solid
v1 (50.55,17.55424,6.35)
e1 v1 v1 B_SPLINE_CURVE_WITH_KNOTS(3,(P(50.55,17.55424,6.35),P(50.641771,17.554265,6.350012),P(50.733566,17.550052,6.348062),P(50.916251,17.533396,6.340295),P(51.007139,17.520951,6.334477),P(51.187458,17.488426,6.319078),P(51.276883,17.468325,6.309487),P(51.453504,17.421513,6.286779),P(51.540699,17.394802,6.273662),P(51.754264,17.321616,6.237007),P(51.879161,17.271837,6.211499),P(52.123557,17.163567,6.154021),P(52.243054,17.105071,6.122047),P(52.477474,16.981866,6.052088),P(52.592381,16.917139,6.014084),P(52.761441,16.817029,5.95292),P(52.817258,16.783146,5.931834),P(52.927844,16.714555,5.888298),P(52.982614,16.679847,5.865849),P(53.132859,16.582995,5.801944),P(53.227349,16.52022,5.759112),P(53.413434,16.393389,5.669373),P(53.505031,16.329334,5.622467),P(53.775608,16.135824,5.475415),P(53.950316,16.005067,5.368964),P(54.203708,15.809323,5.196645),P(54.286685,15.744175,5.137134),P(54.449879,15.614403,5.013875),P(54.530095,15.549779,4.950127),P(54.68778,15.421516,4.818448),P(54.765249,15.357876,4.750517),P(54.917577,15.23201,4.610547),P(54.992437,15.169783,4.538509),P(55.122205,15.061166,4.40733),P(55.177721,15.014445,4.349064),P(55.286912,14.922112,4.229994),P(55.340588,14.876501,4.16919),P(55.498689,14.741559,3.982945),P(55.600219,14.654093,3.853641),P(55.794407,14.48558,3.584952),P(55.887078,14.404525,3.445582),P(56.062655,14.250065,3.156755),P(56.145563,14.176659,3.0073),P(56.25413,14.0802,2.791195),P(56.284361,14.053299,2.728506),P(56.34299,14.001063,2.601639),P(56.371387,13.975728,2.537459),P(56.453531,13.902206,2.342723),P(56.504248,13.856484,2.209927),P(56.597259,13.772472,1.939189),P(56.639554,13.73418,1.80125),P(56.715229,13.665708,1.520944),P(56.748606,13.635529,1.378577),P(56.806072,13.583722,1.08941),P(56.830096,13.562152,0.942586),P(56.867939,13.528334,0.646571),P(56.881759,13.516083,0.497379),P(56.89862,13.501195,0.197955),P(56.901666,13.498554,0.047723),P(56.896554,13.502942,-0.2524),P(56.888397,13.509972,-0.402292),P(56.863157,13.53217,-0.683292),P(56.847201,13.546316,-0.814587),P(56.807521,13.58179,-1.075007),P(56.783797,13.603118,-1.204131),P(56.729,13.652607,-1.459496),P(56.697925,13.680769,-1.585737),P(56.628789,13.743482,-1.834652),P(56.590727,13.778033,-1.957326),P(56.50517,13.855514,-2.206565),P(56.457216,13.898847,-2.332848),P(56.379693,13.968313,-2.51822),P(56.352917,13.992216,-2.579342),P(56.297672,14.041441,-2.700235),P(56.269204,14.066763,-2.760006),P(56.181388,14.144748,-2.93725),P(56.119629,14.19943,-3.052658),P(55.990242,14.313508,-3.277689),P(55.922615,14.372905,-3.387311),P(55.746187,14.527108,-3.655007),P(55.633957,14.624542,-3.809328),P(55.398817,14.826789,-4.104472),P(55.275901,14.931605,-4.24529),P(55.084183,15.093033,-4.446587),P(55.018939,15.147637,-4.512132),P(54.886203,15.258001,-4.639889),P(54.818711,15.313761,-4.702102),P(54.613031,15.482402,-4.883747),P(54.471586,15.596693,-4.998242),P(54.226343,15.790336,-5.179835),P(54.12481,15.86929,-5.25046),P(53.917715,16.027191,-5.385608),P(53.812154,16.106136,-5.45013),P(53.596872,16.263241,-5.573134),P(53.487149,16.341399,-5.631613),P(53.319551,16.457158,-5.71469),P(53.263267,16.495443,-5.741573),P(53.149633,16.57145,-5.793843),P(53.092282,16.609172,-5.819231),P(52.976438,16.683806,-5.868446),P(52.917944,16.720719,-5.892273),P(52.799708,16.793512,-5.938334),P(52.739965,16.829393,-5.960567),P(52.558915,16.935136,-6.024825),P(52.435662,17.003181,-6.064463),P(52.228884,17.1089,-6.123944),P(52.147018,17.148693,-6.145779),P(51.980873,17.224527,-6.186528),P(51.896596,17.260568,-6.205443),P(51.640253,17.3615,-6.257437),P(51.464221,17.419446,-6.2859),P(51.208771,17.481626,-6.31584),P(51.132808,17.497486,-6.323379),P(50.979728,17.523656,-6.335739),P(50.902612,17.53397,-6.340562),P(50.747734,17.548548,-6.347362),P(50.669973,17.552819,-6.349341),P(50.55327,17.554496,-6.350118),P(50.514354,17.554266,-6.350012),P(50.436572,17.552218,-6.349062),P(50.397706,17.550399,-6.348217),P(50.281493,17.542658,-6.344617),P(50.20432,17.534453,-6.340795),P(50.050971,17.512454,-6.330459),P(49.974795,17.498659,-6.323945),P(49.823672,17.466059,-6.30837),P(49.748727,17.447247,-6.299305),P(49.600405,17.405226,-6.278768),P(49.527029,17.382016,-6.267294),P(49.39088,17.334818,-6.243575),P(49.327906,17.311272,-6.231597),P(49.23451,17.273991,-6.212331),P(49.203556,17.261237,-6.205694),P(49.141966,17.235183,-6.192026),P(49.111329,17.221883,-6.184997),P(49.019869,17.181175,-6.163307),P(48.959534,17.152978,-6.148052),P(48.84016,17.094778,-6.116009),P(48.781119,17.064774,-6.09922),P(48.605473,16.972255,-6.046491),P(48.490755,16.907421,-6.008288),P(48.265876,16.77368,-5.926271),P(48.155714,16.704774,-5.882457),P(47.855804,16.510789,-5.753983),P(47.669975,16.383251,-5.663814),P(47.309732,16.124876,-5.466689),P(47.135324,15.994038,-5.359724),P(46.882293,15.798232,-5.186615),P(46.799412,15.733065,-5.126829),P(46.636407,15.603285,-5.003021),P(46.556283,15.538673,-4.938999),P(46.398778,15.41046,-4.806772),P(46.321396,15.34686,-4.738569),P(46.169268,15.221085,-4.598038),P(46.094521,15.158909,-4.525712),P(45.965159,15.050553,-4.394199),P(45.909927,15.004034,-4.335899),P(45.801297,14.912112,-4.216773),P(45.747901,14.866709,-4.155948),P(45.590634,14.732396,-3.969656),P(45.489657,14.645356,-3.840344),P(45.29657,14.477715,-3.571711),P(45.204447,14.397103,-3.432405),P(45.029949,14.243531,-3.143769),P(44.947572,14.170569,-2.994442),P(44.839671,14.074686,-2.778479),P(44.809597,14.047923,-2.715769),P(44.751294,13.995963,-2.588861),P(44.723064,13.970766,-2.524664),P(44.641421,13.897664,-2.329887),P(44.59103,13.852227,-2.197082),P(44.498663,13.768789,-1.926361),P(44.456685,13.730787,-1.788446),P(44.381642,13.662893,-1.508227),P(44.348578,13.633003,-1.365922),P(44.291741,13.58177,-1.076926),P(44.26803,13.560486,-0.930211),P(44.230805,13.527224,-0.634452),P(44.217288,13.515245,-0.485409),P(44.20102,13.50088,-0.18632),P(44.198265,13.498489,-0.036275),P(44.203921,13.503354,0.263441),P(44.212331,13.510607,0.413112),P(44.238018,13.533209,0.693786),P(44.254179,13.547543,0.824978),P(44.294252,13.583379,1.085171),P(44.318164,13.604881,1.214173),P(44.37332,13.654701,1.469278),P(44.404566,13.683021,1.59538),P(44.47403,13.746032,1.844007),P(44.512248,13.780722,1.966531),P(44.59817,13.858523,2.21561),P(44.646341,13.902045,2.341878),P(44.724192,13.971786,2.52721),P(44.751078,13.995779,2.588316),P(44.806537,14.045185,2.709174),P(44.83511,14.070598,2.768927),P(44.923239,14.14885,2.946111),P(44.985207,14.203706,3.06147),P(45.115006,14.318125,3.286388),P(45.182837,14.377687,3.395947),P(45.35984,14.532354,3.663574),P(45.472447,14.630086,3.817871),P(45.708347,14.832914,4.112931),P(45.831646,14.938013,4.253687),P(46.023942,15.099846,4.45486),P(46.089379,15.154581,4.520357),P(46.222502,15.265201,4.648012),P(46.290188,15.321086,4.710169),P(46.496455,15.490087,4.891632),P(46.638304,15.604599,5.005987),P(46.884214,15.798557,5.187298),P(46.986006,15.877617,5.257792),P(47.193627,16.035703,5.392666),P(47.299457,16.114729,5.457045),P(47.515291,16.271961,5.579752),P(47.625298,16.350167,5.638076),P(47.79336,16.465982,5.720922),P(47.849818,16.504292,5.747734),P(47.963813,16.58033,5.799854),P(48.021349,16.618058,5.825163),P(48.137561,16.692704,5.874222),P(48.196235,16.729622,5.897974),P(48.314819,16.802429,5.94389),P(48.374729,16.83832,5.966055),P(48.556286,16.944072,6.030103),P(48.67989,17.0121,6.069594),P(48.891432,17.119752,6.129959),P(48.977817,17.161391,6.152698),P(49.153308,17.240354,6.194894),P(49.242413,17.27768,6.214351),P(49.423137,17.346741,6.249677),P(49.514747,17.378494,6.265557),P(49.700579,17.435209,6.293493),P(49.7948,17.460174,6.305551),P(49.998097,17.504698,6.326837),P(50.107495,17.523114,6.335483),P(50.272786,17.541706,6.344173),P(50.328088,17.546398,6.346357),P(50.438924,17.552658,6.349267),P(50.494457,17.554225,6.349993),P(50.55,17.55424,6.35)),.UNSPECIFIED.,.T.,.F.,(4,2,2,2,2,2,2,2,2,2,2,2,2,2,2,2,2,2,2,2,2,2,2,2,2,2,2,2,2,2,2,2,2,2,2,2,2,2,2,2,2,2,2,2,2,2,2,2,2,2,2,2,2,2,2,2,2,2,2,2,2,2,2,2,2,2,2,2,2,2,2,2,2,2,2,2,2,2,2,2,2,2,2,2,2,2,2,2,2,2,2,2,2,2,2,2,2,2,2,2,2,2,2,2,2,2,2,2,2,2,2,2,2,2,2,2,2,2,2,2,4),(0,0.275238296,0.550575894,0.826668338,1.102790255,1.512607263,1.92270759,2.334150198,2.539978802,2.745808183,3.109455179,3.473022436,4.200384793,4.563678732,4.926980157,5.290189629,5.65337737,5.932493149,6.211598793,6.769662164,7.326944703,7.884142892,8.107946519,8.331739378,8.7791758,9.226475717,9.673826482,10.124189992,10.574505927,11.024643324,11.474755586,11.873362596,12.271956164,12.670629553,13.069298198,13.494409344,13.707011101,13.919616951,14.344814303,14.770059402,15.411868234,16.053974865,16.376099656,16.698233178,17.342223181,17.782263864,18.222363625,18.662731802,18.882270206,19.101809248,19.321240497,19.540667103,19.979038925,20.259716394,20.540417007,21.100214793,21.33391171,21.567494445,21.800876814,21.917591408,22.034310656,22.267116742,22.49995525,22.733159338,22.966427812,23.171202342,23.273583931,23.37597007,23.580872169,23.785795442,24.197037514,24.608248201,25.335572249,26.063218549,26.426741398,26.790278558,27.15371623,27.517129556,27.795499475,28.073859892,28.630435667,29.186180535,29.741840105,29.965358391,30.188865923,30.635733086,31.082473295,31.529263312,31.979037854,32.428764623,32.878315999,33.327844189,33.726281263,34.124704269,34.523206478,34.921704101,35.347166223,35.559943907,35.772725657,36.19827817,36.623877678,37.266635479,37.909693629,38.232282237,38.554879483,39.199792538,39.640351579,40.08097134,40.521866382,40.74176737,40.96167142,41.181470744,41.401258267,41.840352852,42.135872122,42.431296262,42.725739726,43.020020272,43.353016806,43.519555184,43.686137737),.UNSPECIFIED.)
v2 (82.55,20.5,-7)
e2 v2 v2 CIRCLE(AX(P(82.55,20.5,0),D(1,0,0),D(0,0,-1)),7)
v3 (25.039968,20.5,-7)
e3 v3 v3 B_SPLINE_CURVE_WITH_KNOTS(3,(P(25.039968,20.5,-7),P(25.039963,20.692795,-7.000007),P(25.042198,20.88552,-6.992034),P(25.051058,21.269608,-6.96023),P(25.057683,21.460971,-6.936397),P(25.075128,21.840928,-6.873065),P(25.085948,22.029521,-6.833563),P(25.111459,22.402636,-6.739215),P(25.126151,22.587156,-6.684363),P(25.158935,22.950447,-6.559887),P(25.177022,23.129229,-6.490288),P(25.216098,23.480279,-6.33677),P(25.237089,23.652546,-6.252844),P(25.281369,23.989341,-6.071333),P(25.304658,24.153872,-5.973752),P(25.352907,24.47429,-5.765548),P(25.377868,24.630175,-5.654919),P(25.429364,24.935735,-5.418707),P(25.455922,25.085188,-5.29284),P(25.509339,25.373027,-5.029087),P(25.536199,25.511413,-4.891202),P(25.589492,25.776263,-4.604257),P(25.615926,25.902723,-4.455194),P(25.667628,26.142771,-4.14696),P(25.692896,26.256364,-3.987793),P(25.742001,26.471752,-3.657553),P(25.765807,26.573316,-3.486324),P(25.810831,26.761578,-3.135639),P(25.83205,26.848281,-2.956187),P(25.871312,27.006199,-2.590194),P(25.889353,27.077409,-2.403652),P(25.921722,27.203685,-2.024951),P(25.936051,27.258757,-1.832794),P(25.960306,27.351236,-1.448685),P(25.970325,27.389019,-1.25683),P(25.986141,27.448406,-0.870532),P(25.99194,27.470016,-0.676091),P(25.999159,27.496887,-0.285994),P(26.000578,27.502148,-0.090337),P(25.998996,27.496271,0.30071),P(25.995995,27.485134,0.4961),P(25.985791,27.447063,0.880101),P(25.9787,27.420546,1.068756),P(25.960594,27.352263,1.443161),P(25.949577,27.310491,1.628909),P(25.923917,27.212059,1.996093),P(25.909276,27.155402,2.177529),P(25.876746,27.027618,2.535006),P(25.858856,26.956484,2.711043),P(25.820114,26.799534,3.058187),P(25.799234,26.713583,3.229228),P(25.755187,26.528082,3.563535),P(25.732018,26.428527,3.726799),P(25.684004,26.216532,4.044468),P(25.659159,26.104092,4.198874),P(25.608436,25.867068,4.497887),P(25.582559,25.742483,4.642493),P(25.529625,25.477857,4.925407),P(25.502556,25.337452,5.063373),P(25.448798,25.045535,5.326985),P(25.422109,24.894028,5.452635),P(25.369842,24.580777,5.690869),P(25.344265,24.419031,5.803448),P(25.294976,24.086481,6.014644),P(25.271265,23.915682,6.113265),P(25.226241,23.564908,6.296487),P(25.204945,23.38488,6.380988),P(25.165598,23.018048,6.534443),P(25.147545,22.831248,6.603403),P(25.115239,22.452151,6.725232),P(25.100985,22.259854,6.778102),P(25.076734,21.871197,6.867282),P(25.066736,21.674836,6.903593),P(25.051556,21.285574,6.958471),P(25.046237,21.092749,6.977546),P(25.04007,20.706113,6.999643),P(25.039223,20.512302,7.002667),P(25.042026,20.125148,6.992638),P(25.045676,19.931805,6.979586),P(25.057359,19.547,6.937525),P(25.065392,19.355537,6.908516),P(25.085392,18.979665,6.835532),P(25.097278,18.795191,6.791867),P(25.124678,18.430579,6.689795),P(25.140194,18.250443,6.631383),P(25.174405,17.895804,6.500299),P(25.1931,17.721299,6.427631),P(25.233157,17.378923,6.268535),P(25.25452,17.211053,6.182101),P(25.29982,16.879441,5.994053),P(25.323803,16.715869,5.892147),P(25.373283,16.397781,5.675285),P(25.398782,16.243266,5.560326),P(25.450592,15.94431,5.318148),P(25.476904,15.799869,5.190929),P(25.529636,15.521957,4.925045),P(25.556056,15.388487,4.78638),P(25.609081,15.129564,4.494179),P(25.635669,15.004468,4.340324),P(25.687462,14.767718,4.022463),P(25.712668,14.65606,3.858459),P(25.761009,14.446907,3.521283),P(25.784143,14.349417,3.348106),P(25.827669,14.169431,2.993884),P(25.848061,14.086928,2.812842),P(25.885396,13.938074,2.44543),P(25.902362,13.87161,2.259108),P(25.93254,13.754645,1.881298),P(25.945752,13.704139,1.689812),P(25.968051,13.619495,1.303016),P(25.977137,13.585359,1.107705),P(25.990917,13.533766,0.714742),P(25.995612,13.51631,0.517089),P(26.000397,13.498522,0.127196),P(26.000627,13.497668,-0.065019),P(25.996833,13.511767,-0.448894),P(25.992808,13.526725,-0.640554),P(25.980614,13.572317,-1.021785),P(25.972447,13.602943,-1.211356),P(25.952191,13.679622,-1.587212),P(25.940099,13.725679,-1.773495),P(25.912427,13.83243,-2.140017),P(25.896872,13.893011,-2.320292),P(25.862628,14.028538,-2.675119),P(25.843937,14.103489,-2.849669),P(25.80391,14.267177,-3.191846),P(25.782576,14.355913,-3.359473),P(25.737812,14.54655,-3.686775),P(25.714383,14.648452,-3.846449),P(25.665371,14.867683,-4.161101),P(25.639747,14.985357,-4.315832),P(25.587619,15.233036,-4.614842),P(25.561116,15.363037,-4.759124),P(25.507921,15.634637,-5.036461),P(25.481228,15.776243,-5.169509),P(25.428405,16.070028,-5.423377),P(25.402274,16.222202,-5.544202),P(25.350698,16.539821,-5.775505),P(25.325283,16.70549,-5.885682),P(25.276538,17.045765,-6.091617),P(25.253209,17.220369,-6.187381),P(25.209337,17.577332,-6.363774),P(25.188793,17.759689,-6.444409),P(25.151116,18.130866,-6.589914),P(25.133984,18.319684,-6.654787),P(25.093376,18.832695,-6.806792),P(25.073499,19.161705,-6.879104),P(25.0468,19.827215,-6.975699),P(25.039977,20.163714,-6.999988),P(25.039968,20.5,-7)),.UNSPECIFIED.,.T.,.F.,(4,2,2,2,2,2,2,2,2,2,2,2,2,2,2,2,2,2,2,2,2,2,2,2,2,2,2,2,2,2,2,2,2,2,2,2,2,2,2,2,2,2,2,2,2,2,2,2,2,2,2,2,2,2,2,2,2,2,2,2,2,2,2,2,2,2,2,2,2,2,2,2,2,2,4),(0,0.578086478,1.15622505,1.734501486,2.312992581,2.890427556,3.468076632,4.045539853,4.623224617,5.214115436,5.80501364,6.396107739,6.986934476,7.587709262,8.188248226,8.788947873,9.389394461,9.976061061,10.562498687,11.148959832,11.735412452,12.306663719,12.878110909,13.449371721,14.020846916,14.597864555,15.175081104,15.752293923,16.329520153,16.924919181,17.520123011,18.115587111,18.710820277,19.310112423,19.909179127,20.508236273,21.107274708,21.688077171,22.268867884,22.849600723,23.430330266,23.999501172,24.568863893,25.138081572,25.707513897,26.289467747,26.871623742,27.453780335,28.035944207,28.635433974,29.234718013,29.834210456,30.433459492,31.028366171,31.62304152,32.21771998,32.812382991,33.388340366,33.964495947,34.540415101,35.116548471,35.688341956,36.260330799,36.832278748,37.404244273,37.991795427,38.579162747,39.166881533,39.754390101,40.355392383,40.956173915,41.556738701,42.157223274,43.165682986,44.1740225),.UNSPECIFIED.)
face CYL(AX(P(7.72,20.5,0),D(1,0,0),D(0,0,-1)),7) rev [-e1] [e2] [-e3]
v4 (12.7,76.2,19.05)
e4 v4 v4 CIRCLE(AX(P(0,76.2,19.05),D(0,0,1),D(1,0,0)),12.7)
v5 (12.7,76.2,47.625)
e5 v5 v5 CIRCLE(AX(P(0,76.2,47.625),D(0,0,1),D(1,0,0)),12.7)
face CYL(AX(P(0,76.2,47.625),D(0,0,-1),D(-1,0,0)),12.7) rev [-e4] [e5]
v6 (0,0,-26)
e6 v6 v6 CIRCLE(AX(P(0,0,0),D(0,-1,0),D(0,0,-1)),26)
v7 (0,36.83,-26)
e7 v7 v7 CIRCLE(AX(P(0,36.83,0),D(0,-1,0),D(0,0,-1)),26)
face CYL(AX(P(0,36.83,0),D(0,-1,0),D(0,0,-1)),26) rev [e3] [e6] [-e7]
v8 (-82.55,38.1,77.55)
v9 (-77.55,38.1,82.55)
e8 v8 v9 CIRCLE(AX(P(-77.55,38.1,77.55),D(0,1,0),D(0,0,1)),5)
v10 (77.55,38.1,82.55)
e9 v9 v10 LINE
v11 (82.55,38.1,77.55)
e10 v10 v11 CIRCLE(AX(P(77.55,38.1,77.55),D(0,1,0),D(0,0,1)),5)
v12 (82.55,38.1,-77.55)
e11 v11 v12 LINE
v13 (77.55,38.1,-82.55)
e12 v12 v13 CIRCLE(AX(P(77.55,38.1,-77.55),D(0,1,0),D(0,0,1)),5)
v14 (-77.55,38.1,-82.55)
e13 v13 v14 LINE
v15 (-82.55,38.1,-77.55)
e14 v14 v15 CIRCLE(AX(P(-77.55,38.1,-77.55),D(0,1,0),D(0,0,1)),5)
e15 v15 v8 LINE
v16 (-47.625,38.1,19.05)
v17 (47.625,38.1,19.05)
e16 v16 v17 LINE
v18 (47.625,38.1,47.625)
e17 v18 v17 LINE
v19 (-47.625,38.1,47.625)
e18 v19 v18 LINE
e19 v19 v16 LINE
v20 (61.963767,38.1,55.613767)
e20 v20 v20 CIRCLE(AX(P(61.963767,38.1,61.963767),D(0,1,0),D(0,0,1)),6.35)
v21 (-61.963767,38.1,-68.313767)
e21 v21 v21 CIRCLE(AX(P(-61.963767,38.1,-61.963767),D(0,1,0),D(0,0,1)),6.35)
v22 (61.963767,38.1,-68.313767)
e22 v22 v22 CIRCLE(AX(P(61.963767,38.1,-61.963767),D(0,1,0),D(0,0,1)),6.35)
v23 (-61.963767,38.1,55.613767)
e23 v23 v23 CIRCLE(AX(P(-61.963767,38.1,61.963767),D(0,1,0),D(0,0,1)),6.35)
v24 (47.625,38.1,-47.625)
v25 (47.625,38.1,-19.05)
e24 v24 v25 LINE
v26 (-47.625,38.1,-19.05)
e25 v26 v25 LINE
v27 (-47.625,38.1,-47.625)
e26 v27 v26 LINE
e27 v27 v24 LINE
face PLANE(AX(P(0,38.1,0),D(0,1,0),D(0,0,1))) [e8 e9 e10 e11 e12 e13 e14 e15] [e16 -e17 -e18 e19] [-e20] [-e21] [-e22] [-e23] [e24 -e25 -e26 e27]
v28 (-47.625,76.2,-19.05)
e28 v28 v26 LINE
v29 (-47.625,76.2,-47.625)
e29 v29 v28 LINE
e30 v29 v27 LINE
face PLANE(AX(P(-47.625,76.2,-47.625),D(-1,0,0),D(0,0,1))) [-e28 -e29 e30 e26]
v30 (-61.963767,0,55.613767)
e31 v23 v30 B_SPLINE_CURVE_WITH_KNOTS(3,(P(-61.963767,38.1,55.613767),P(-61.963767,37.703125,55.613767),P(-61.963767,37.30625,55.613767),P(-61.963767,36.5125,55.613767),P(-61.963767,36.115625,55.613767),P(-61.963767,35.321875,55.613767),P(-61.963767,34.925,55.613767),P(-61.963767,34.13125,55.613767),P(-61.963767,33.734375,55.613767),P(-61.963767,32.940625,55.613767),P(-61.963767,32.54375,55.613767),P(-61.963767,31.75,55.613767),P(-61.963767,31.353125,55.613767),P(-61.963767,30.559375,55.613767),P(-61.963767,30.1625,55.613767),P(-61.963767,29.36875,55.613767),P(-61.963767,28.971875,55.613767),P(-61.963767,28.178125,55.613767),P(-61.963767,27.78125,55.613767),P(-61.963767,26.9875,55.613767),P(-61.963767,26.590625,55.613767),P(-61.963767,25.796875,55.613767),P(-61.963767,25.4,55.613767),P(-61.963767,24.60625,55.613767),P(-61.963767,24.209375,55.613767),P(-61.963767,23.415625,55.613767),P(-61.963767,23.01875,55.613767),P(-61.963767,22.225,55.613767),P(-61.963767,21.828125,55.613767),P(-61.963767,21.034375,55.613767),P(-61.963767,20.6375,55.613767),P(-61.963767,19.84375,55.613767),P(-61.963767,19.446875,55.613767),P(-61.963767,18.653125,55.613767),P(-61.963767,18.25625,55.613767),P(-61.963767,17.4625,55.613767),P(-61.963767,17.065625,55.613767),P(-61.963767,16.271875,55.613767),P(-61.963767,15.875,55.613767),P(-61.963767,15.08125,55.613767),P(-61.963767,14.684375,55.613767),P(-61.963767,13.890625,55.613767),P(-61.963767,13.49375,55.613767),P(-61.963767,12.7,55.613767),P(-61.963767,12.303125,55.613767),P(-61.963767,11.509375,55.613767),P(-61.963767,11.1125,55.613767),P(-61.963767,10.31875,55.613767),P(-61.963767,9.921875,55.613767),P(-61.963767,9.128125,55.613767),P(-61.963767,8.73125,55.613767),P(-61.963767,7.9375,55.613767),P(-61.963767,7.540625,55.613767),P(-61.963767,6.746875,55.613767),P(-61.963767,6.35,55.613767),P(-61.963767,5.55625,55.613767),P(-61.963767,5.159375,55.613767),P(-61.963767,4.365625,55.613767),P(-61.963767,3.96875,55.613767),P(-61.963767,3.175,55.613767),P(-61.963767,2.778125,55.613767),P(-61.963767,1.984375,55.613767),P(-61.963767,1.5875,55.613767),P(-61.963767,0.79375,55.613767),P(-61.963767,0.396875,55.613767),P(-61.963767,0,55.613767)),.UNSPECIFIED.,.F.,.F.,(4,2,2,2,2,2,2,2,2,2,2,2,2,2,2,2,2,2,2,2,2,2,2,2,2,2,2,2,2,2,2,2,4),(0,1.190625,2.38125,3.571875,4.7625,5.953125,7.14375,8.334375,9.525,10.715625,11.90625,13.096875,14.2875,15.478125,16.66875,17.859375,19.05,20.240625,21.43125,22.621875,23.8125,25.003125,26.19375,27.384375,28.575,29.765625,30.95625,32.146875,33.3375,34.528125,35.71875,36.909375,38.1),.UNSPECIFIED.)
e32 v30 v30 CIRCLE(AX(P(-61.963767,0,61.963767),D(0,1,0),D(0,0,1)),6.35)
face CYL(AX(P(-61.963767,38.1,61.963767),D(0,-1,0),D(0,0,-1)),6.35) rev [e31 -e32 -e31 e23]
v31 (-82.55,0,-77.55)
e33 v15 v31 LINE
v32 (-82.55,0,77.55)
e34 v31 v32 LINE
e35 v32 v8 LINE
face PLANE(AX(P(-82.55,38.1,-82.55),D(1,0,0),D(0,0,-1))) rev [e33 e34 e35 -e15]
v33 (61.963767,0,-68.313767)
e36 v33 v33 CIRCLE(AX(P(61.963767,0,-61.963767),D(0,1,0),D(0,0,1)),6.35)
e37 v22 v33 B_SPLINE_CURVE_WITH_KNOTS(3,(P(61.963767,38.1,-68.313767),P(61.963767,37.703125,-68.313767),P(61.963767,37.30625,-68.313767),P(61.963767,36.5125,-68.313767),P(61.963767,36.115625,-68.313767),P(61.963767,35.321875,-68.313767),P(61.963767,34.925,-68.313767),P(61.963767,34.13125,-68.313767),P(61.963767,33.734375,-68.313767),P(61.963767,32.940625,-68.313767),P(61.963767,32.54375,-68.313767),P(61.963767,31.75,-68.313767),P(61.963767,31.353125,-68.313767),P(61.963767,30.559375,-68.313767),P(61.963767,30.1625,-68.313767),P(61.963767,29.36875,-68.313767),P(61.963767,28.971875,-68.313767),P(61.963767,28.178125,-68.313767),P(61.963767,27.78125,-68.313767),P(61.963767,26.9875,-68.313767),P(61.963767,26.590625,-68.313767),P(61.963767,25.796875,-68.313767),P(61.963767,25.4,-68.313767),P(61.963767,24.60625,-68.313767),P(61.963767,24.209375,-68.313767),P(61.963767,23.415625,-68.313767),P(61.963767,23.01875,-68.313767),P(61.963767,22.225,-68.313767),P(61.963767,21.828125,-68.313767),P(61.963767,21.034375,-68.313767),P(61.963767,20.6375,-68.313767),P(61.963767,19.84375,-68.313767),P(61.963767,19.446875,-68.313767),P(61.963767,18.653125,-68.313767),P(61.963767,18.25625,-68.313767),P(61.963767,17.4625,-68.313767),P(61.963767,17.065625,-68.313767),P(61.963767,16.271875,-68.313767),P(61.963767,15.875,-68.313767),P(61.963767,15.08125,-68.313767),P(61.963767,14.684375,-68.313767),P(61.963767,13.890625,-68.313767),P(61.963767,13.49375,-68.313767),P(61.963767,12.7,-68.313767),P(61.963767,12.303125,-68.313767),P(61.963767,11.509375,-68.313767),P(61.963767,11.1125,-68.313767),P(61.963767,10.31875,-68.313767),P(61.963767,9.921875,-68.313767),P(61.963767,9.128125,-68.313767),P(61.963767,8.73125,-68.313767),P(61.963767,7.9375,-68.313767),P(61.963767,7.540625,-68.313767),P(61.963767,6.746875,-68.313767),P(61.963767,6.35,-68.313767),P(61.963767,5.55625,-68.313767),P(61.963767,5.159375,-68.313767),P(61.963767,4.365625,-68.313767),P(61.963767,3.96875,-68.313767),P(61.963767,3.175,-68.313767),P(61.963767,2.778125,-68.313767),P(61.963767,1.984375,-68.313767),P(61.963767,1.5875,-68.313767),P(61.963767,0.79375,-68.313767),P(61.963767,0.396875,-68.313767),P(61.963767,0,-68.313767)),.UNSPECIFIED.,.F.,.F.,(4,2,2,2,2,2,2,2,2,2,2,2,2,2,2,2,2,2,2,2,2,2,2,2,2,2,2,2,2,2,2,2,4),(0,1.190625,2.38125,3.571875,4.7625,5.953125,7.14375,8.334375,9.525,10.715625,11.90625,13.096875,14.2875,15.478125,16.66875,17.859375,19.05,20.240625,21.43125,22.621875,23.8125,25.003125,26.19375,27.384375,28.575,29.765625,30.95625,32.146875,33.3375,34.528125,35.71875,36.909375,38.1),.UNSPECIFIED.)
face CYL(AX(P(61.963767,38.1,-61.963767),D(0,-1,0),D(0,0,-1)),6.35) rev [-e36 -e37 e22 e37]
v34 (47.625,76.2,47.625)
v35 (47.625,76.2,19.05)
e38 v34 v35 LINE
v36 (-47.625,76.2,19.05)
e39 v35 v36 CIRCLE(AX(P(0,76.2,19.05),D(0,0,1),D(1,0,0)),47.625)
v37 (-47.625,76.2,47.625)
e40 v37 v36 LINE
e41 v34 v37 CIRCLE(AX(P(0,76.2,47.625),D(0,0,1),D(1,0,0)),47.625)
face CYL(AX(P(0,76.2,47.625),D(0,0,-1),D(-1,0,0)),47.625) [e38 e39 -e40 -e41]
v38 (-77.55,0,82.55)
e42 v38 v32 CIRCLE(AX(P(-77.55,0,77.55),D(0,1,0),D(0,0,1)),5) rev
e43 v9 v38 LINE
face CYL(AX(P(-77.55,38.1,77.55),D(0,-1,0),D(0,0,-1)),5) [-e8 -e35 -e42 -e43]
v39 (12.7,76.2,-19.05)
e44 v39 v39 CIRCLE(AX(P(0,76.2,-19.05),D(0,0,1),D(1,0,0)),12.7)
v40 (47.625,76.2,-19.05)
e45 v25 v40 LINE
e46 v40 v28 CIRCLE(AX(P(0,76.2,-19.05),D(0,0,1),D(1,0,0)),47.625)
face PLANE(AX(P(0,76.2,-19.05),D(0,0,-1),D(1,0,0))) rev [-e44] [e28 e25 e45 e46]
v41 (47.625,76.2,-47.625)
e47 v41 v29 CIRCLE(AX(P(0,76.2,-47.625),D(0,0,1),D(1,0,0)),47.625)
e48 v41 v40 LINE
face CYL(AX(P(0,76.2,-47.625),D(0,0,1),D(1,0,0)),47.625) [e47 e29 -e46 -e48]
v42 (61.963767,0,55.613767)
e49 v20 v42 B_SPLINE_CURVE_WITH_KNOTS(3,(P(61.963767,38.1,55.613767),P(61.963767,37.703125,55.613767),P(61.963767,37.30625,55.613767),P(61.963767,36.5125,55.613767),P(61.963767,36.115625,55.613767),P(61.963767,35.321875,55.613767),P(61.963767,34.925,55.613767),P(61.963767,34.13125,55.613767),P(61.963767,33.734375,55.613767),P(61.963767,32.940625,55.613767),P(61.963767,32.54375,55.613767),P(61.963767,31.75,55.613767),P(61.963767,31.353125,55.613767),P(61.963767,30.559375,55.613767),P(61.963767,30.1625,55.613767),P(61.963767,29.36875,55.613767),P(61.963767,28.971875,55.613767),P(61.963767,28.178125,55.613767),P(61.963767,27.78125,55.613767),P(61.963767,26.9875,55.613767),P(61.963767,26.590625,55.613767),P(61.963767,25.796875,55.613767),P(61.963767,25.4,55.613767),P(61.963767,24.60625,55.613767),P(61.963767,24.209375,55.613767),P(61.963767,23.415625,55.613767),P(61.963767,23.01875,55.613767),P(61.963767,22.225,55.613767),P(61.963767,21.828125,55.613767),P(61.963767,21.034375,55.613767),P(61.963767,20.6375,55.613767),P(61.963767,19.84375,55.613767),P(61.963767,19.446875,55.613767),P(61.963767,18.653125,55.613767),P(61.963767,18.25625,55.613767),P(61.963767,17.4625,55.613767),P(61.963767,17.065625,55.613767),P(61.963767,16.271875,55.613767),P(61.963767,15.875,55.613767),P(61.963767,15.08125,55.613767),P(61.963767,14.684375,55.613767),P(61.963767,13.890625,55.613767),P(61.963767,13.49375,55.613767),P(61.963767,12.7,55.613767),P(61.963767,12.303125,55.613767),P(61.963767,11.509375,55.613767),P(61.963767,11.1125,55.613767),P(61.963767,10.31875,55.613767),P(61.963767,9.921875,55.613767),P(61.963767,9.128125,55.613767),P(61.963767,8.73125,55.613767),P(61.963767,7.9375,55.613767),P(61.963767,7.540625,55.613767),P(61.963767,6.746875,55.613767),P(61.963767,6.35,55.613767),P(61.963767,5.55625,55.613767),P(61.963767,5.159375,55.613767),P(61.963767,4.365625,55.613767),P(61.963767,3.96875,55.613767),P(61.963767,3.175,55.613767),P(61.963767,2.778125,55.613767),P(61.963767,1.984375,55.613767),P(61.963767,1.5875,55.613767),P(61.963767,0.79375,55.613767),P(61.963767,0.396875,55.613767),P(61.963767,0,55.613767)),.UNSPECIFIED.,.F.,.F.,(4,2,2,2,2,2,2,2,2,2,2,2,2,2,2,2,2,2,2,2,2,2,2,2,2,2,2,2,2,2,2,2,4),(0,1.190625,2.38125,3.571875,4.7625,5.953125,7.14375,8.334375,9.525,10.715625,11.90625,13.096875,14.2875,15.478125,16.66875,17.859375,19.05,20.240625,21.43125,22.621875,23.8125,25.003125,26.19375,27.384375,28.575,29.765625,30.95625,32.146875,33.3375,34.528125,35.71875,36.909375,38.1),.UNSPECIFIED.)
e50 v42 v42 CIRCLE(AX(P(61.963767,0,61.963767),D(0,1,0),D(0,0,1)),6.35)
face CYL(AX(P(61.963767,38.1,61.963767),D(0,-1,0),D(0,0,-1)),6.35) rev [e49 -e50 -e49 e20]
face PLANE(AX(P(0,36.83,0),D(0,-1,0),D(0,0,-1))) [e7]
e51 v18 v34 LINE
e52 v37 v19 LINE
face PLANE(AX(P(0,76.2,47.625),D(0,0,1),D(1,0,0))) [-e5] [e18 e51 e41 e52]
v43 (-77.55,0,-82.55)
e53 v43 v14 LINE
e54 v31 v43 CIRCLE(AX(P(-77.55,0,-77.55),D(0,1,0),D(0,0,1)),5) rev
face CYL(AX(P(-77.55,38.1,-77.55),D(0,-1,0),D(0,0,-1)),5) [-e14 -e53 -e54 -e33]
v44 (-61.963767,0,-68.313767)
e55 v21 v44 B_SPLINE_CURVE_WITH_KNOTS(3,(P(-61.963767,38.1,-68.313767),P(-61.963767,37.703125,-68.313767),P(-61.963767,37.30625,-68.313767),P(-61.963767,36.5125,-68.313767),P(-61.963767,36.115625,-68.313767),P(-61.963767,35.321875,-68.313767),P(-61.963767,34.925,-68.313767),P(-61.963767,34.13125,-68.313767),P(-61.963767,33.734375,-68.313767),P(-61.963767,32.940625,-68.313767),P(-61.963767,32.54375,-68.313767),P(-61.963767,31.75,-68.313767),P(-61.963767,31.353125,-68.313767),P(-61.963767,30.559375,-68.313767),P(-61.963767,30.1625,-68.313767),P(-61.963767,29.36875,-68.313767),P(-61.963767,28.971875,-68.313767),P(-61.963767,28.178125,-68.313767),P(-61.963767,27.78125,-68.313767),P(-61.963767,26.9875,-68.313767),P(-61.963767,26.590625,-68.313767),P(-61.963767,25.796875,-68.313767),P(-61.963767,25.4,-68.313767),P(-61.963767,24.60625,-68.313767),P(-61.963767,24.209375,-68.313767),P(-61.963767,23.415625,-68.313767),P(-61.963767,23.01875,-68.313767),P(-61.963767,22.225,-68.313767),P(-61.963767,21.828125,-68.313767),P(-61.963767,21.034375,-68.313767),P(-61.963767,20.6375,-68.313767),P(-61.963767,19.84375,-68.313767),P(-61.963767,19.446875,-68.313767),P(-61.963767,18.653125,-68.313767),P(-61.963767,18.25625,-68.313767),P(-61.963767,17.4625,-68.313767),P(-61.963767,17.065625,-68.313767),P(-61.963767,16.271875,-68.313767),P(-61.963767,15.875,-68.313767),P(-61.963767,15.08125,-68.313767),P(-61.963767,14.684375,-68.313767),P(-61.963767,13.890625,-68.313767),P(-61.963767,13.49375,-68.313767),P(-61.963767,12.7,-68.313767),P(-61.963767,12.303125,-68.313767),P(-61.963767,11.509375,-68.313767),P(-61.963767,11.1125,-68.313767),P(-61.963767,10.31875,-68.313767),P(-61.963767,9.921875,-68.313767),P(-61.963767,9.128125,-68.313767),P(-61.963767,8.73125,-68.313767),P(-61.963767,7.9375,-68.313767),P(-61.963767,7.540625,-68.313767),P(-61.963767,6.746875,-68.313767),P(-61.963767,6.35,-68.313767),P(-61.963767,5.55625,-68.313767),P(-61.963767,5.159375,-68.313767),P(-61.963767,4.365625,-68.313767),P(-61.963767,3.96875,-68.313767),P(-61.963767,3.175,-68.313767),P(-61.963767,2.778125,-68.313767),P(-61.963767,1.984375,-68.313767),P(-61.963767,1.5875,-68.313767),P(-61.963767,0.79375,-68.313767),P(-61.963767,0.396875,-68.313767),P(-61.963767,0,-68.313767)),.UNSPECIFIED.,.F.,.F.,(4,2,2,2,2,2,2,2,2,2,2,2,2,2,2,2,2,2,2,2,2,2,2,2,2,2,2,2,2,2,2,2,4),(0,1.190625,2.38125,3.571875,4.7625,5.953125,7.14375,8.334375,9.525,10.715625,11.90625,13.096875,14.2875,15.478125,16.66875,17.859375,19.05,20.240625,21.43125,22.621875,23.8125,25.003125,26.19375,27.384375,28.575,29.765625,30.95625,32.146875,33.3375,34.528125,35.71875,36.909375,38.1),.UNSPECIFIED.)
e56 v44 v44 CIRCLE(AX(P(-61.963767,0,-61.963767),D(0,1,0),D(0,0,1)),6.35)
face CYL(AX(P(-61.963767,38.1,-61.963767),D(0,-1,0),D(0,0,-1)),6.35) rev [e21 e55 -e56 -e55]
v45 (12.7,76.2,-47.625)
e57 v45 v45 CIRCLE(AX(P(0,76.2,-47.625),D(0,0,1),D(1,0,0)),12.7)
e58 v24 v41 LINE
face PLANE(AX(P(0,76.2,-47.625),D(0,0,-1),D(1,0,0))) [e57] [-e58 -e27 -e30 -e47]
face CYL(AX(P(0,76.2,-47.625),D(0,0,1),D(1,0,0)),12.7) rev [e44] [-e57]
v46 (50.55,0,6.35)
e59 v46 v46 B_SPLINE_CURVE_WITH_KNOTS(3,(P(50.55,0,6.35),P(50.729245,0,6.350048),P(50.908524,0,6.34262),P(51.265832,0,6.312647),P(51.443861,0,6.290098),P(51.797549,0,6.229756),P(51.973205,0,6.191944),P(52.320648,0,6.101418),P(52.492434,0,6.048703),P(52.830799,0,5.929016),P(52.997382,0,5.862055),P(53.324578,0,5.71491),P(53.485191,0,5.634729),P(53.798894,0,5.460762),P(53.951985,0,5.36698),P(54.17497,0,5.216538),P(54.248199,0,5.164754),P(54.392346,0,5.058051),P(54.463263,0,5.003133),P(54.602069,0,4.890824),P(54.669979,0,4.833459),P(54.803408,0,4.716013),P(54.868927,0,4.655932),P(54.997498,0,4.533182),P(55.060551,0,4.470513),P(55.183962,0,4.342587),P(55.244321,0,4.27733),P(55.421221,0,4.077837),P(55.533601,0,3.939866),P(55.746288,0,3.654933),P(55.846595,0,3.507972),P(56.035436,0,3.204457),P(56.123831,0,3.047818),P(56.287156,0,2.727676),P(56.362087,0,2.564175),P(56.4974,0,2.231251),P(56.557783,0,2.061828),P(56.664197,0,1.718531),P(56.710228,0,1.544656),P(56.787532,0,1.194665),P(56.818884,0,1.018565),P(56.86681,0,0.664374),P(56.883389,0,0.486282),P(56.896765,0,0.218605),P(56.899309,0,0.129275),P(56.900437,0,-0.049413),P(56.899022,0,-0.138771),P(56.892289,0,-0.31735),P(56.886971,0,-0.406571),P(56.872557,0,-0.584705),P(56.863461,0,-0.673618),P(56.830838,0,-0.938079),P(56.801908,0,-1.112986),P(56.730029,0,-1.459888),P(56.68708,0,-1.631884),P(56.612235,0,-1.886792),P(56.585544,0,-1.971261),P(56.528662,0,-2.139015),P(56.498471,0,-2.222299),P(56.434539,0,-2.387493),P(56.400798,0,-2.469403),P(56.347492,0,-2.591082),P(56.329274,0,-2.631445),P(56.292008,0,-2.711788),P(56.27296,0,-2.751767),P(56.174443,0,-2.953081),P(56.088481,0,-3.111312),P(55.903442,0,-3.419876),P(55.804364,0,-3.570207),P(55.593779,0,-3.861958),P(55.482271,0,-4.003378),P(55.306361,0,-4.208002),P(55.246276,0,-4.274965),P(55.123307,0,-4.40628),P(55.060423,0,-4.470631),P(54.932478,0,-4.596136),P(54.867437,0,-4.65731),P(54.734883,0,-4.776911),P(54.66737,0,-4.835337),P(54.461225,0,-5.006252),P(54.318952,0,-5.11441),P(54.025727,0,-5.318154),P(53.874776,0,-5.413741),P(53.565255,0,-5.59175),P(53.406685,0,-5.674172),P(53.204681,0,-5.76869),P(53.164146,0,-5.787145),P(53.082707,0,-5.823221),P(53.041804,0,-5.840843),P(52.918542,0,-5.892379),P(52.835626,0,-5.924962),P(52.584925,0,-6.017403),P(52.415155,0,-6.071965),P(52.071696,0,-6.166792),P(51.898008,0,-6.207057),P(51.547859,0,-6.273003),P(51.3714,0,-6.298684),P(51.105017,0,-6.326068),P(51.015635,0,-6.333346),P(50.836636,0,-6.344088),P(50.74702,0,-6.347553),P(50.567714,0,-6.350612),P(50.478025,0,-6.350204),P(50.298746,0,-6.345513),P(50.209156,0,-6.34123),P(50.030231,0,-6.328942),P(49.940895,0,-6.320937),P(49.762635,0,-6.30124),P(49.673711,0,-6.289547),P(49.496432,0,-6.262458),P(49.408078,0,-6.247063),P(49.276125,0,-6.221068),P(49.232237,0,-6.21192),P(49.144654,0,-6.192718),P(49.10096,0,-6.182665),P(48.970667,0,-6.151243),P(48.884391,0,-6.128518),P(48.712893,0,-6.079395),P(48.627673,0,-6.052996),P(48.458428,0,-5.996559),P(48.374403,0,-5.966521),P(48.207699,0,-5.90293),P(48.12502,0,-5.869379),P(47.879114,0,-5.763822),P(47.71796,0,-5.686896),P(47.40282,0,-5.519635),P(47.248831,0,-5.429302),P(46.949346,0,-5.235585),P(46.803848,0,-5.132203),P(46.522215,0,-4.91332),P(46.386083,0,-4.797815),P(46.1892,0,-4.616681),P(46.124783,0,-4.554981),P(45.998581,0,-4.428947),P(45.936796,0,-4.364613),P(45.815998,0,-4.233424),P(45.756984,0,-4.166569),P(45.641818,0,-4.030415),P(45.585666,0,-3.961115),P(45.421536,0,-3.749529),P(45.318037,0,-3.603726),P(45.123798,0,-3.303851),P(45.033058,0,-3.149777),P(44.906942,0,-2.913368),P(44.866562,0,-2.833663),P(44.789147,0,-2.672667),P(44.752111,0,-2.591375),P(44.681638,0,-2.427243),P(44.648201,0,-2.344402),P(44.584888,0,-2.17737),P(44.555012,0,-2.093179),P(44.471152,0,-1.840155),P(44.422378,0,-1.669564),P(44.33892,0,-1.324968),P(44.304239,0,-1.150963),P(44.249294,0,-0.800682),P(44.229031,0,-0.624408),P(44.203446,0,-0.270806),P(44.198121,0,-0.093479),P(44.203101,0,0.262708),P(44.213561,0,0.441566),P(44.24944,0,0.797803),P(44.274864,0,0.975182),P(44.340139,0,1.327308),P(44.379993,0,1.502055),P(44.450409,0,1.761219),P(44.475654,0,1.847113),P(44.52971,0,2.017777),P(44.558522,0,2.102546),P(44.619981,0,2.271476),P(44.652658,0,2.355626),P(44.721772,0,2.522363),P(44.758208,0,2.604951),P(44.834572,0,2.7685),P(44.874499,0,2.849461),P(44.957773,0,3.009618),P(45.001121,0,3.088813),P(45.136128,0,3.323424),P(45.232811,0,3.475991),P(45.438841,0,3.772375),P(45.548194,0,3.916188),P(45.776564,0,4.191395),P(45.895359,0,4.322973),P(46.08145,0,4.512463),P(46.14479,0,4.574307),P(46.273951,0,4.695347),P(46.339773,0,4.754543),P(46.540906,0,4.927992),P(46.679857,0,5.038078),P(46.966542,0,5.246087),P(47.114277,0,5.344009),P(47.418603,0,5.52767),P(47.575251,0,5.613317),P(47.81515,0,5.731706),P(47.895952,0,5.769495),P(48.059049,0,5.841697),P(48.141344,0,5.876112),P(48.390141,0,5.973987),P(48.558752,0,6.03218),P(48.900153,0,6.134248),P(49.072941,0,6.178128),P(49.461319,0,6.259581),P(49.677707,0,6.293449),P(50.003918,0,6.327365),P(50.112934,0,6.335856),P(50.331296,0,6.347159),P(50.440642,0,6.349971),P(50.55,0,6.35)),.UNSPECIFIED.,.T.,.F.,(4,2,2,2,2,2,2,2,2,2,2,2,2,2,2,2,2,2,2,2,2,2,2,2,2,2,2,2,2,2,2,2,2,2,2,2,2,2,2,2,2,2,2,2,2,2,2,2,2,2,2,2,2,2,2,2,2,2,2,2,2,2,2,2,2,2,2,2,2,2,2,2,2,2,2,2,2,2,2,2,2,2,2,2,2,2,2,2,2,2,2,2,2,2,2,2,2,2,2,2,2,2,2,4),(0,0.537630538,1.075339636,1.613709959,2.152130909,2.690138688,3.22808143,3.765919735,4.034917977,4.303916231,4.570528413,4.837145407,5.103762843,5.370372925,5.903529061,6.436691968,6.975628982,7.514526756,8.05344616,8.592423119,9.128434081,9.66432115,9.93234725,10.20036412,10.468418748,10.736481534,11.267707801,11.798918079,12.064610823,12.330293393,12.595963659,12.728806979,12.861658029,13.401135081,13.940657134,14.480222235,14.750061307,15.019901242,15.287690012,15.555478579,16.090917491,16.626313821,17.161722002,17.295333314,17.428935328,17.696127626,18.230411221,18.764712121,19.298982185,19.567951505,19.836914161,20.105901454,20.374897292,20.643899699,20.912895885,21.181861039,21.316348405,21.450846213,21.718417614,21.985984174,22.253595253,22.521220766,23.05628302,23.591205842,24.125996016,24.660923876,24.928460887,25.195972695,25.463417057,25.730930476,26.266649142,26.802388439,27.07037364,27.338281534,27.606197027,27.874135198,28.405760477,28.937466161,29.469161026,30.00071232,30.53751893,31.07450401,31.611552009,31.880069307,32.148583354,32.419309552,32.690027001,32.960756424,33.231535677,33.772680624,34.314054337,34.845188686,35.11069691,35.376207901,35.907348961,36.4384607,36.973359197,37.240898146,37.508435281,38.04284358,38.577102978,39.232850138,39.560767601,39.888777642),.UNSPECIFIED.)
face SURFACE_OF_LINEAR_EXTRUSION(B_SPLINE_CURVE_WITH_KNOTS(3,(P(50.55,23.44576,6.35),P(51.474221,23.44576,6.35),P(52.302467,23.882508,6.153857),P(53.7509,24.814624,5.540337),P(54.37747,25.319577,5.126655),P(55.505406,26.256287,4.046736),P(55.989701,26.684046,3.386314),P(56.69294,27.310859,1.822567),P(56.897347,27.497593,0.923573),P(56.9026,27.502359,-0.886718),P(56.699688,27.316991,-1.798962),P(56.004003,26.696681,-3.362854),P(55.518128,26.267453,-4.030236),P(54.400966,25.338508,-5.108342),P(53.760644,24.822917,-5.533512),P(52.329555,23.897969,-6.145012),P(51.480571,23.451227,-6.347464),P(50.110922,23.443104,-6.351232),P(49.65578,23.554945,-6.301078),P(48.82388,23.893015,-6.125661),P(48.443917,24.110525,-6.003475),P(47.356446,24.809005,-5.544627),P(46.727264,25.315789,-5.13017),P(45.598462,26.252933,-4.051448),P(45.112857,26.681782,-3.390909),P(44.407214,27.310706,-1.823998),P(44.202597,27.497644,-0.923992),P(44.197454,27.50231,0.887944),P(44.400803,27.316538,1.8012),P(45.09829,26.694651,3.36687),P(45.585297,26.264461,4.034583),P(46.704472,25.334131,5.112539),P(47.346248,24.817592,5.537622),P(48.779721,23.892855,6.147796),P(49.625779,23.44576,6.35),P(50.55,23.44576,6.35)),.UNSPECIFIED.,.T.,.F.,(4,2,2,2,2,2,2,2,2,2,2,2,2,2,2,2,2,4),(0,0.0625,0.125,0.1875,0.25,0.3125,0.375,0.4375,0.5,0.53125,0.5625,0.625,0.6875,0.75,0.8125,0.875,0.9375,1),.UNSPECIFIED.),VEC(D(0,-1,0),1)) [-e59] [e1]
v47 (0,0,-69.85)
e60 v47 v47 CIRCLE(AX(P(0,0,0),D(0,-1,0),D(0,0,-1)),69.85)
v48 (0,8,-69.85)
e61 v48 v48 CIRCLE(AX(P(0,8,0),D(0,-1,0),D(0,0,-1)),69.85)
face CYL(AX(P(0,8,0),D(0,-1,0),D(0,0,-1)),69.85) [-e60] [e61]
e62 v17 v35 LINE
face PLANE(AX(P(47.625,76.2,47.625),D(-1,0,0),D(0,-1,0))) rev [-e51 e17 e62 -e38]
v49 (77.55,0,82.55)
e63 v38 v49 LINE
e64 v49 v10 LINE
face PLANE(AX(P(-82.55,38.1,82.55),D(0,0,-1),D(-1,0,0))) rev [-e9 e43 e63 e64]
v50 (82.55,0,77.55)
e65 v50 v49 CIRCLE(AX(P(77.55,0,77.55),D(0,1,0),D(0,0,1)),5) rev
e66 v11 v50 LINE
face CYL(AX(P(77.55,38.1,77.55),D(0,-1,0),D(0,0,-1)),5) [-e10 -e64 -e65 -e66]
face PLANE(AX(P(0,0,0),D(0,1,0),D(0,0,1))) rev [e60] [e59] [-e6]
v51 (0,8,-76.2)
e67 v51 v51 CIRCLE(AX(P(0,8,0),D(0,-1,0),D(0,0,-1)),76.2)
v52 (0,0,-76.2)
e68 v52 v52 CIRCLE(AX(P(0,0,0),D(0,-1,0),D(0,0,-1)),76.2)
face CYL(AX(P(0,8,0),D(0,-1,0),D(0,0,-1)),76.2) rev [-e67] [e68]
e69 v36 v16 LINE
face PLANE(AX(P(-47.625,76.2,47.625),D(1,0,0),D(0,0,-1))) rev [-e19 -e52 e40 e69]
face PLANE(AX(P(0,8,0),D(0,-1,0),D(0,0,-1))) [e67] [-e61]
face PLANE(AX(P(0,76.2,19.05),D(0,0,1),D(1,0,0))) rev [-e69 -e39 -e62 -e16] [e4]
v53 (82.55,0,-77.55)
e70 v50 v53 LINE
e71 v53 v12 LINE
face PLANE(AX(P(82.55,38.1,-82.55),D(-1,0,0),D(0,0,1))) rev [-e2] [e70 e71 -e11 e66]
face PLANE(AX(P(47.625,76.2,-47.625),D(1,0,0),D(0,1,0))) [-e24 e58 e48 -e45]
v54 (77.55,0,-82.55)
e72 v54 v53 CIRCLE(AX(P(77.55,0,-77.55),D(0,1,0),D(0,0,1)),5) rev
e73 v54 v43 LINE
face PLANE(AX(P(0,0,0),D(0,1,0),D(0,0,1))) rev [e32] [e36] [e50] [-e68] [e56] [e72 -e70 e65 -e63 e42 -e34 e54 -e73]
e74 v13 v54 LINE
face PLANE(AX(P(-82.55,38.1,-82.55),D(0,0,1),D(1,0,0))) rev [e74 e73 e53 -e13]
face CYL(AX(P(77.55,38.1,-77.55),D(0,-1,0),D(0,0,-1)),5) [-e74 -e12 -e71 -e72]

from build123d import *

# Parameters (mm, degrees)
SKETCH1_W           = 165.1
SKETCH1_H           = 165.1
SKETCH1_R           = 6.35
BOSS_EXTRUDE1_DEPTH = 38.1
BOSS_EXTRUDE2_START = 19.05
SKETCH2_R           = 12.7
BOSS_EXTRUDE2_DEPTH = 28.575
SKETCH3_R           = 26
CUT_EXTRUDE1_DEPTH  = 36.83
SKETCH4_R           = 7
CUT_EXTRUDE2_DEPTH  = 74.83
CUT_EXTRUDE3_START  = -38.1
CUT_EXTRUDE3_DEPTH  = 17.554240545
FILLET1_R           = 5
SKETCH6_R           = 76.2
SKETCH6_R_2         = 69.85
CUT_EXTRUDE4_DEPTH  = 8


# Read off the part's stored shape, not the designer's step: Cut-Extrude3
with BuildPart() as part:
    # Sketch1 → Boss-Extrude1 (new body)
    with BuildSketch(Plane(origin=(0, 0, 0), x_dir=(1, 0, 0), z_dir=(0, 1, 0))):
        Rectangle(SKETCH1_W, SKETCH1_H)
        with Locations(Location((-61.963767235, 61.963767235, 0), (0, 0, 90))):
            Circle(SKETCH1_R, mode=Mode.SUBTRACT)
        with Locations(Location((61.963767235, 61.963767235, 0), (0, 0, 90))):
            Circle(SKETCH1_R, mode=Mode.SUBTRACT)
        with Locations(Location((61.963767235, -61.963767235, 0), (0, 0, 90))):
            Circle(SKETCH1_R, mode=Mode.SUBTRACT)
        with Locations(Location((-61.963767235, -61.963767235, 0), (0, 0, 90))):
            Circle(SKETCH1_R, mode=Mode.SUBTRACT)
    extrude(amount=BOSS_EXTRUDE1_DEPTH)

    # Sketch2 → Boss-Extrude2 (add)
    with BuildSketch(Plane.XY.offset(BOSS_EXTRUDE2_START)):
        with BuildLine():
            Line((-47.625, 76.2), (-47.625, 38.1))
            Line((-47.625, 38.1), (47.625, 38.1))
            Line((47.625, 38.1), (47.625, 76.2))
            ThreePointArc((47.625, 76.2), (0, 123.825), (-47.625, 76.2))
        make_face()
        with Locations((0, 76.2)):
            Circle(SKETCH2_R, mode=Mode.SUBTRACT)
    boss_extrude2 = extrude(amount=BOSS_EXTRUDE2_DEPTH)

    # Mirror1: Boss-Extrude2 across plane
    add(boss_extrude2.mirror(Plane.XY))

    # Sketch3 → Cut-Extrude1 (cut)
    with BuildSketch(Plane.XZ):
        with Locations(Location((0, 0, 0), (0, 0, 270))):
            Circle(SKETCH3_R)
    extrude(amount=-CUT_EXTRUDE1_DEPTH, mode=Mode.SUBTRACT)

    # Sketch4 → Cut-Extrude2 (cut)
    with BuildSketch(Plane(origin=(82.55, 0, 0), x_dir=(0, 0, -1), z_dir=(1, 0, 0))):
        with Locations((0, 20.5)):
            Circle(SKETCH4_R)
    extrude(amount=-CUT_EXTRUDE2_DEPTH, mode=Mode.SUBTRACT)

    # Cut-Extrude3 outline → Cut-Extrude3 (cut)
    with BuildSketch(Plane(origin=(0, 38.1, 0), x_dir=(1, 0, 0), z_dir=(0, 1, 0)).offset(CUT_EXTRUDE3_START)):
        with BuildLine():
            add(Edge.make_bspline(
                [(50.55, -6.35), (51.47422126, -6.35), (52.302466674, -6.153856691), (53.750900163, -5.540336611), (54.377469866, -5.126654902), (55.505405632, -4.046735856), (55.989700628, -3.386313597), (56.692940175, -1.822566515), (56.897346558, -0.923572623), (56.902599966, 0.886717767), (56.699688489, 1.798962244), (56.004003016, 3.362853664), (55.518127515, 4.030235701), (54.400965604, 5.108341681), (53.760643664, 5.533511906), (52.329554982, 6.145011865), (51.480571337, 6.347463595), (50.110922006, 6.351232148), (49.655780423, 6.301077578), (48.823880157, 6.125660583), (48.443917363, 6.00347472), (47.356446167, 5.544626686), (46.727263651, 5.130170088), (45.598462304, 4.051448232), (45.112857079, 3.390908719), (44.407214336, 1.82399818), (44.202597079, 0.923991808), (44.197454079, -0.88794427), (44.40080252, -1.801200354), (45.098290108, -3.366869707), (45.585297177, -4.034583157), (46.704472395, -5.112538783), (47.346247575, -5.537622225), (48.779720786, -6.147796435), (49.62577874, -6.35), (50.55, -6.35)],
                knots=[0, 0, 0, 0, 0.0625, 0.0625, 0.125, 0.125, 0.1875, 0.1875, 0.25, 0.25, 0.3125, 0.3125, 0.375, 0.375, 0.4375, 0.4375, 0.5, 0.5, 0.53125, 0.53125, 0.5625, 0.5625, 0.625, 0.625, 0.6875, 0.6875, 0.75, 0.75, 0.8125, 0.8125, 0.875, 0.875, 0.9375, 0.9375, 1, 1, 1, 1], degree=3))
        make_face()
    extrude(amount=CUT_EXTRUDE3_DEPTH, mode=Mode.SUBTRACT)

    # Fillet1
    fillet1_edges = [part.edges().sort_by_distance(p)[0] for p in [
        (82.55, 19.05, 82.55),
        (-82.55, 19.05, 82.55),
        (-82.55, 19.05, -82.55),
        (82.55, 19.05, -82.55),
    ]]
    fillet(fillet1_edges, radius=FILLET1_R)

    # Sketch6 → Cut-Extrude4 (cut)
    with BuildSketch(Plane.XZ):
        with Locations(Location((0, 0, 0), (0, 0, 270))):
            Circle(SKETCH6_R)
        with Locations(Location((0, 0, 0), (0, 0, 270))):
            Circle(SKETCH6_R_2, mode=Mode.SUBTRACT)
    extrude(amount=-CUT_EXTRUDE4_DEPTH, mode=Mode.SUBTRACT)


solid = part.part
